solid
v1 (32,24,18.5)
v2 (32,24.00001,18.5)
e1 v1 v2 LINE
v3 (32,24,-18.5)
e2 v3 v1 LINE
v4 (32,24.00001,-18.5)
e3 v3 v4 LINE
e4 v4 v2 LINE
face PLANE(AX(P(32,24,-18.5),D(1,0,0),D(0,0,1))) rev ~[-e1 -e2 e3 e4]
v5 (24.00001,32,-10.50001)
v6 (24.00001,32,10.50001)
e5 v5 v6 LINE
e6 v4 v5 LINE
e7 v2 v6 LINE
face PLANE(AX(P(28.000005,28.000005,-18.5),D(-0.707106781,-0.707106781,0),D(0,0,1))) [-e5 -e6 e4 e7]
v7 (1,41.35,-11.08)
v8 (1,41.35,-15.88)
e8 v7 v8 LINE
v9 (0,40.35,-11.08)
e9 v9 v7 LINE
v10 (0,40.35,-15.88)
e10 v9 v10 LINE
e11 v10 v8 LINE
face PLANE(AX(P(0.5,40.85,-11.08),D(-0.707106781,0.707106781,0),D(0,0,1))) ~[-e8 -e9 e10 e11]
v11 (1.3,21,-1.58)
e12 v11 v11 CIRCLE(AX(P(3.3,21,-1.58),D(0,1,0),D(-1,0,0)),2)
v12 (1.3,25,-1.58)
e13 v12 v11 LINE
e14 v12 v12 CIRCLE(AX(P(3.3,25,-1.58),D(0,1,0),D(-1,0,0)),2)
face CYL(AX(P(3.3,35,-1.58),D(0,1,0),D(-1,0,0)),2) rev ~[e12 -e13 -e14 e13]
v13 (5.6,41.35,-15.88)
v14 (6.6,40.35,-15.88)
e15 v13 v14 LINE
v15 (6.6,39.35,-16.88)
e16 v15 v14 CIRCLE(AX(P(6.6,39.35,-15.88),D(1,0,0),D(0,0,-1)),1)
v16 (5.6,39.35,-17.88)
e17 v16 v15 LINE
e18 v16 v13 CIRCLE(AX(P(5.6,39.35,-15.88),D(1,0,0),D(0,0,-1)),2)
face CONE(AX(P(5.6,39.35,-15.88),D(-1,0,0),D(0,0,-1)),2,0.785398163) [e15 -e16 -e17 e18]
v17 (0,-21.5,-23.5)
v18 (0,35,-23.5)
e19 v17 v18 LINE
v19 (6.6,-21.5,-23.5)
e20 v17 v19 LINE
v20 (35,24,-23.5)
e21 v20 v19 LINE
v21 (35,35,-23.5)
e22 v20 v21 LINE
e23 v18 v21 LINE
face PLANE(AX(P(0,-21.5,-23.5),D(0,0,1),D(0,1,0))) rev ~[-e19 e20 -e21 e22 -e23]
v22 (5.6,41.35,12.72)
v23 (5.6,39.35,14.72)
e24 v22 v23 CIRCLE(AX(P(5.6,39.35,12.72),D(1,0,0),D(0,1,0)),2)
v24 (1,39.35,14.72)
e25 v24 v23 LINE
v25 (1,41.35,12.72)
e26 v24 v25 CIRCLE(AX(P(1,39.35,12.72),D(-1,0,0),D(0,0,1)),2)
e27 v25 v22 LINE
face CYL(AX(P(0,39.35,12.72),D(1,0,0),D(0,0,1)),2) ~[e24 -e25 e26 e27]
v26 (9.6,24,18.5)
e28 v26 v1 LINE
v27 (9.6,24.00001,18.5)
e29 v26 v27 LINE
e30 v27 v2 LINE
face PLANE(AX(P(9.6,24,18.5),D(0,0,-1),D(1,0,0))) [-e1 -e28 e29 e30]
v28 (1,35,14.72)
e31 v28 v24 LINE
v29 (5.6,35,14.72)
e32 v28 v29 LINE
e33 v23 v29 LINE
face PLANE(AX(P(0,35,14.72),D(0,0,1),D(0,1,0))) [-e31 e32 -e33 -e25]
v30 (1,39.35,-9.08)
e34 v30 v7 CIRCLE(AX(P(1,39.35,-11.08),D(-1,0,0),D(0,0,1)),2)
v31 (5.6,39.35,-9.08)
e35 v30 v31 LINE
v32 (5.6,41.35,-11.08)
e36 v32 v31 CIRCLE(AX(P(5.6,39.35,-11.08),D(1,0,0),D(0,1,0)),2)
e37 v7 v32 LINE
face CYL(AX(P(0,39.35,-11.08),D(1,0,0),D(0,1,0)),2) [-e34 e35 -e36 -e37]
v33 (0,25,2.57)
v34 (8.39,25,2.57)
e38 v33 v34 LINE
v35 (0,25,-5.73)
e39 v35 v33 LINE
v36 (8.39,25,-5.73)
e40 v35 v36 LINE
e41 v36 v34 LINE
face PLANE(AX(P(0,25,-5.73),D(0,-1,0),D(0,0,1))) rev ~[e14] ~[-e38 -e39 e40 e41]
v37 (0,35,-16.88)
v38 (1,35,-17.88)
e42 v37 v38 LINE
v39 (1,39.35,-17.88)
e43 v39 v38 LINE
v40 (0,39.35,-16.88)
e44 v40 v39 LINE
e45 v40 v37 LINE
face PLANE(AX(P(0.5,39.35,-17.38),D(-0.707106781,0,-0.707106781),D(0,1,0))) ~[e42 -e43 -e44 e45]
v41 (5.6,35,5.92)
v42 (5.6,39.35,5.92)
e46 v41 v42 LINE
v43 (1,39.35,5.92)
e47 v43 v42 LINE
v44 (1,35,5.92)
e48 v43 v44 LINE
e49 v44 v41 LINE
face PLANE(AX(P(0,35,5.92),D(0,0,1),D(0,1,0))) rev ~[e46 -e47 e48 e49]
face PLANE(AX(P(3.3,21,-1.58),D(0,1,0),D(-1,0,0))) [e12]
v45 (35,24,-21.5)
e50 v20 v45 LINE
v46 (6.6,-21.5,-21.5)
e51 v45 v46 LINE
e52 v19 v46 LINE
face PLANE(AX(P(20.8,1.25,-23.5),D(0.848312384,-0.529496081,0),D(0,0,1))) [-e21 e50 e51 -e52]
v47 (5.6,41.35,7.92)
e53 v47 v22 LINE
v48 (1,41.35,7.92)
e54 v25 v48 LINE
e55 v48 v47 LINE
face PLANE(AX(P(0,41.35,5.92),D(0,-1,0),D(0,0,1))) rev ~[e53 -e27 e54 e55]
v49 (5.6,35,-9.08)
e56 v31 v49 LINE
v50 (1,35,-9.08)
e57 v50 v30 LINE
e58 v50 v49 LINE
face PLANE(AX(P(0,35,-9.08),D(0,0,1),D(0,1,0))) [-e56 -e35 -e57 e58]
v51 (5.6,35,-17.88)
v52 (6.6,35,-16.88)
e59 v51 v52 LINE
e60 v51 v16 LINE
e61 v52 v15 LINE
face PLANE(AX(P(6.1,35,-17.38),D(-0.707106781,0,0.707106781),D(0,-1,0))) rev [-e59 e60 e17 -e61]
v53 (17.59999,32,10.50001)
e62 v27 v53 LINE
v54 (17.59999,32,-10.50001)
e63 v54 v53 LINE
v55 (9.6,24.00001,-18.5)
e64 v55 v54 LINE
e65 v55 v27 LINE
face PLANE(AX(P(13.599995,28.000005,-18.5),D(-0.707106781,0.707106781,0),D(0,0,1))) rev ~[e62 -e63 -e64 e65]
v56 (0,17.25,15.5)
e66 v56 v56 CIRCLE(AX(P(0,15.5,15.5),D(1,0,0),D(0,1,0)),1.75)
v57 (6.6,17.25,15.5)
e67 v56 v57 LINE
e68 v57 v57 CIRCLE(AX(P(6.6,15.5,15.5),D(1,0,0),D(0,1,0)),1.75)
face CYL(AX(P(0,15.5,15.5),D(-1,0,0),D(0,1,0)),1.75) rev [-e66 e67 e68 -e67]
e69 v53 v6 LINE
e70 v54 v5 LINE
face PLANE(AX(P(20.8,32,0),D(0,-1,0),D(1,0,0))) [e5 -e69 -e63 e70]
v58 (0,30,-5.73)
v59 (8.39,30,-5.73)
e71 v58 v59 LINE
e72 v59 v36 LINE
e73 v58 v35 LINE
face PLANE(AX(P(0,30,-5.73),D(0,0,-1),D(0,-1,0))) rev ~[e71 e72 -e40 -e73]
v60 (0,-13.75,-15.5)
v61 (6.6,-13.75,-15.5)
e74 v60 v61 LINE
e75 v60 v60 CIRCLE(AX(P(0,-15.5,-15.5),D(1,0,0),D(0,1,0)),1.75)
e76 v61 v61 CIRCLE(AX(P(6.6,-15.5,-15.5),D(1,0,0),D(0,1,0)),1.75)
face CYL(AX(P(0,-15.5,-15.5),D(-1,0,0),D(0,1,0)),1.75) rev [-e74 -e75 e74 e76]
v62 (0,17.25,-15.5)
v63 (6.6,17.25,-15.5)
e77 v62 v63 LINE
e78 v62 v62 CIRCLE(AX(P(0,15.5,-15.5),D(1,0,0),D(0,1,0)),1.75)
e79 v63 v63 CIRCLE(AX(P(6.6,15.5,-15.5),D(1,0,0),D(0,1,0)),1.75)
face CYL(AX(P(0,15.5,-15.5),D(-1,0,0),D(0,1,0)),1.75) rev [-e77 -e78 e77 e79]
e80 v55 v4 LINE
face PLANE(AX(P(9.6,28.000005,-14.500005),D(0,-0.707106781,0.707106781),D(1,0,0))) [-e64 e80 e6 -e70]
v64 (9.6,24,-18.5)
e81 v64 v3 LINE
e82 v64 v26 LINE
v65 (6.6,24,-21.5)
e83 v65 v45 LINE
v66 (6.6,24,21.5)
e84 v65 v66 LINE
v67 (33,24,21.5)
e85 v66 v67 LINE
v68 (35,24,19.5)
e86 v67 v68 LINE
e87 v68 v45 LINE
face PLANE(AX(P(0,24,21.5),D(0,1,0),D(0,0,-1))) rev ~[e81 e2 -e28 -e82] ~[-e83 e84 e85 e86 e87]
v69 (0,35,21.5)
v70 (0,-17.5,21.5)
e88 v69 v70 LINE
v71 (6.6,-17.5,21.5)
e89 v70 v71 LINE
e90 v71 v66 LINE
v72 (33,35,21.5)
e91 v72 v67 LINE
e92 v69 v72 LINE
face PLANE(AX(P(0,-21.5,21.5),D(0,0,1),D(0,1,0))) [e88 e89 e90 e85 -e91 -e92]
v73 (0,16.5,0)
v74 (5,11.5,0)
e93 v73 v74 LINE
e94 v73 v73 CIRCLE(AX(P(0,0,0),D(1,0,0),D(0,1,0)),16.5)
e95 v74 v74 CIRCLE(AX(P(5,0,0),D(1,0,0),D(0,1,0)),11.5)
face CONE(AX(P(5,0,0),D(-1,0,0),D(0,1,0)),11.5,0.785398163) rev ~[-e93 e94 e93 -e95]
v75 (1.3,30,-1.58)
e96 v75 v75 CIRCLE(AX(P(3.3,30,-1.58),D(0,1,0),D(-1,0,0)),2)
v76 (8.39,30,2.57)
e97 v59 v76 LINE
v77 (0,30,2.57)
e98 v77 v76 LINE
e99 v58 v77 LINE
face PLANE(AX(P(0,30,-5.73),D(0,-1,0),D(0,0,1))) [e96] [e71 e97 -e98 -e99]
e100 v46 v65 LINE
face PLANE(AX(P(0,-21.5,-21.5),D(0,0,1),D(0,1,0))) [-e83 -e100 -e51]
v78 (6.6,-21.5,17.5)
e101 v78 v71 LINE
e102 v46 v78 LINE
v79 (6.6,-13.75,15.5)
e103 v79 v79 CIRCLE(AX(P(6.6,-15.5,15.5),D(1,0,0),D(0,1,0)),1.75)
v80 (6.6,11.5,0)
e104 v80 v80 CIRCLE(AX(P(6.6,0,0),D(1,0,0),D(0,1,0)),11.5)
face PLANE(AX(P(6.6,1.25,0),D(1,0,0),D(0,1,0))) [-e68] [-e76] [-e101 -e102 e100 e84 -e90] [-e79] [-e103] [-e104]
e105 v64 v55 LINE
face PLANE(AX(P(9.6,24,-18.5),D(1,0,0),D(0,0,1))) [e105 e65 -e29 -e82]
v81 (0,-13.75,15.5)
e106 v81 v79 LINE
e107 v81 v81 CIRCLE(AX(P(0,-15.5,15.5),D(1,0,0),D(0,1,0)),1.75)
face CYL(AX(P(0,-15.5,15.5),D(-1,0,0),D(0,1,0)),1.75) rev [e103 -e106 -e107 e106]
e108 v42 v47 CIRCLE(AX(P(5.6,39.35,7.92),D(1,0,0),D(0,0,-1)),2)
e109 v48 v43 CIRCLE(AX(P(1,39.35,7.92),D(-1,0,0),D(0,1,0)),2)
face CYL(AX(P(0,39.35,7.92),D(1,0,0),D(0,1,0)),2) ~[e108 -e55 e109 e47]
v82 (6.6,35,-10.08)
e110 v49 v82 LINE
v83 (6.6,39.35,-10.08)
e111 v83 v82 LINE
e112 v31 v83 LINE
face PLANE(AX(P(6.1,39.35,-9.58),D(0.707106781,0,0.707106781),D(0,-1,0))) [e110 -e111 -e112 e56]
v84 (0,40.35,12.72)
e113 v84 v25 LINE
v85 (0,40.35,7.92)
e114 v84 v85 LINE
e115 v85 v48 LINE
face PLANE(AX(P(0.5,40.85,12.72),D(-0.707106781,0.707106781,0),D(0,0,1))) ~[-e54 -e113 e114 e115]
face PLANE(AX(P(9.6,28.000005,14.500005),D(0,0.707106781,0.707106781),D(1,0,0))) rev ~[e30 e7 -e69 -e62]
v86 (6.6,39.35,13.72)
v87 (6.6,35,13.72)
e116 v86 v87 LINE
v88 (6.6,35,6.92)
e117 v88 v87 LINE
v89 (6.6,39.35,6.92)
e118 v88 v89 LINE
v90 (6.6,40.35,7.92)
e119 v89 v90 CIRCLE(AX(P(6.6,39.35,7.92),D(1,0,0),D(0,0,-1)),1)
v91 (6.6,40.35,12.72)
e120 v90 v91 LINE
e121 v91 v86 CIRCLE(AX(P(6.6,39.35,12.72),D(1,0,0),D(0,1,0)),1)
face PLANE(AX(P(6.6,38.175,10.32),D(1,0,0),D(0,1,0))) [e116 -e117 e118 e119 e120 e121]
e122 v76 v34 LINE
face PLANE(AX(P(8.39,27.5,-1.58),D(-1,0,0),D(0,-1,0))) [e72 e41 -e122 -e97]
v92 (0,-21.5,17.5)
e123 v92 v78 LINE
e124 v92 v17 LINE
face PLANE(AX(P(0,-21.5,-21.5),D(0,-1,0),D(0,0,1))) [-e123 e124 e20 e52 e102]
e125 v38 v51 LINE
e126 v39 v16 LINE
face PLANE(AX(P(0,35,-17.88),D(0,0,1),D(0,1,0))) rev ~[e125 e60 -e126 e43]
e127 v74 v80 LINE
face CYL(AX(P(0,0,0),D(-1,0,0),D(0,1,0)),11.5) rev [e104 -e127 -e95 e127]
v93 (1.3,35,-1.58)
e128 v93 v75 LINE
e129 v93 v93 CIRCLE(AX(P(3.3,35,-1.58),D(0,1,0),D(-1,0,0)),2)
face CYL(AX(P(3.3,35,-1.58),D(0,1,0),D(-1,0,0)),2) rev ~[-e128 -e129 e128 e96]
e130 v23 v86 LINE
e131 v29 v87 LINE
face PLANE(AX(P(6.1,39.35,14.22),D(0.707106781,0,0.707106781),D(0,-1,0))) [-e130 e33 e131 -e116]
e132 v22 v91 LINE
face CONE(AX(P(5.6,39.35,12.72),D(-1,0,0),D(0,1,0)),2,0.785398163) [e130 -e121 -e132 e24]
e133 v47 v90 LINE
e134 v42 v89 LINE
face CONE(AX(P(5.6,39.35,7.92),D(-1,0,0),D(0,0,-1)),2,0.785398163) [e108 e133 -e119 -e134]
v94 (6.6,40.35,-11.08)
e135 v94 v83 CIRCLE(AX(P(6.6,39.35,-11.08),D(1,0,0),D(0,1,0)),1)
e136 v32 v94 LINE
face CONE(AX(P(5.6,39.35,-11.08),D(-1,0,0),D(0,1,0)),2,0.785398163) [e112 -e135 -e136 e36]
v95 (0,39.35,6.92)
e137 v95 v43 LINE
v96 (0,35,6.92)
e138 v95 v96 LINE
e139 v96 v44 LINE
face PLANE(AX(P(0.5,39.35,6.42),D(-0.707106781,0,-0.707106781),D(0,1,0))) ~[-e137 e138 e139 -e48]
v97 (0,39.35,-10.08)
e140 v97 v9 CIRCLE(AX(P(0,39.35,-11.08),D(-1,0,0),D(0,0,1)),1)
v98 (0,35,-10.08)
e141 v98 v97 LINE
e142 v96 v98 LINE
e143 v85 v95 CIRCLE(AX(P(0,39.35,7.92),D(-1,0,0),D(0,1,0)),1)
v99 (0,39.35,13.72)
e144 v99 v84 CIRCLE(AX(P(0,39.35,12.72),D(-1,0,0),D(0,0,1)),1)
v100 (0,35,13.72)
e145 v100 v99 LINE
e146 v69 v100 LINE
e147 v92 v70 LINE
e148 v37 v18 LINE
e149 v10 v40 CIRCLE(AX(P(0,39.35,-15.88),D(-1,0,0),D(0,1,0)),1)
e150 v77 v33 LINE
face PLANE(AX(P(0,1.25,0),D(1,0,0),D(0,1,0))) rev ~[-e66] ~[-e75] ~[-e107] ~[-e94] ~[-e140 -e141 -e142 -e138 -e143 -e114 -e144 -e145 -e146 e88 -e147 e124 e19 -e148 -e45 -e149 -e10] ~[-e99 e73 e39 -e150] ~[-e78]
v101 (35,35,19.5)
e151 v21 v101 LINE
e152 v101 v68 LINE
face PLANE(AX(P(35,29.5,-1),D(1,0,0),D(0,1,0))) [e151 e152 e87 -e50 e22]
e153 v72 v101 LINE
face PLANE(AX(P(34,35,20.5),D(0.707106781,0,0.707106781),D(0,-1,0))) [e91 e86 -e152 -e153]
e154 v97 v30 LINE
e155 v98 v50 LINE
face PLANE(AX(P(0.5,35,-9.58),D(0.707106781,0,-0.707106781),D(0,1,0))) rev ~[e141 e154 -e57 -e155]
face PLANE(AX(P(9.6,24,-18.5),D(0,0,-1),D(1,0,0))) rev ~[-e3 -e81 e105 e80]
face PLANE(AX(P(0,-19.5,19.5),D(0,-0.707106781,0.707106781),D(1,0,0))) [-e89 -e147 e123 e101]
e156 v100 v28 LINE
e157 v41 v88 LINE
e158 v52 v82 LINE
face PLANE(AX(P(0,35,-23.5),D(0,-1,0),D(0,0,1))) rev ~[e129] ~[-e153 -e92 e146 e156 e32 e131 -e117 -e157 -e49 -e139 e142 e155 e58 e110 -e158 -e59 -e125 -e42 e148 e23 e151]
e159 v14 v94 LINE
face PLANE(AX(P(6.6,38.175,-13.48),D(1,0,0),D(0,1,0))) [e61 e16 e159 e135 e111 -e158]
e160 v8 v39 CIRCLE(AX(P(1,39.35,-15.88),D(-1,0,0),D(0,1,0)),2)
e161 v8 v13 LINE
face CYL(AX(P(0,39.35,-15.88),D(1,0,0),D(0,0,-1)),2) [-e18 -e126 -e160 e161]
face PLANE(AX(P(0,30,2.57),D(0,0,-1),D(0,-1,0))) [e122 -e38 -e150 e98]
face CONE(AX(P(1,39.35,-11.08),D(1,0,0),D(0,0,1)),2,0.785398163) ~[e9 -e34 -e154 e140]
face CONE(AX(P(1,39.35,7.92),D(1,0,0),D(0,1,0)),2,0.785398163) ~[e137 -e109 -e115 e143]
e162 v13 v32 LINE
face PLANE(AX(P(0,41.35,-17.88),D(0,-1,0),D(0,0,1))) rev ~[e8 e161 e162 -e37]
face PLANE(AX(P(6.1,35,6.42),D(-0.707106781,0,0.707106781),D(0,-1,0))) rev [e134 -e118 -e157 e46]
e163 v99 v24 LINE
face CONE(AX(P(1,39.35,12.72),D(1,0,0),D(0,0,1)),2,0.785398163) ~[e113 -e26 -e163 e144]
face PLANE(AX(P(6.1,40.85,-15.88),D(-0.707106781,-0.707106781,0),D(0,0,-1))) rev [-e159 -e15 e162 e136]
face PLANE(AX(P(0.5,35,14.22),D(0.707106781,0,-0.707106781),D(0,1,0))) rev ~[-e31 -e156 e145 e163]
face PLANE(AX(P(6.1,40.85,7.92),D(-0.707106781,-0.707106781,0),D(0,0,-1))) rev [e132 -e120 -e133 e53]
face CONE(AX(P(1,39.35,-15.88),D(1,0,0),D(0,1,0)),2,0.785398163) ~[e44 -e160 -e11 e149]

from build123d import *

# Parameters (mm, degrees)
F0_W      = 45.5
F0_H      = 2
F1_DEPTH  = 35
F0_H_2    = 43
F0_R      = 1.75
F0_R_2    = 11.5
F2_DEPTH  = 6.6
F0_W_2    = 6.35
F0_H_3    = 8.8
F3_DEPTH  = 6.6
F4_R      = 2
F5_DEPTH  = 14
F6_W      = 5
F6_H      = 8.3
F7_DEPTH  = 8.39
F8_SIZE2  = 28.4
F8_SIZE   = 45.5
F9_R      = 2
F10_SIZE  = 1
F11_SIZE  = 4
F12_SIZE  = 5
F13_W     = 22.4
F13_H     = 37
F14_DEPTH = 8
F15_SIZE  = 7.99999
F16_SIZE  = 2


# Not quite as in the source:
# - a fillet or chamfer is up to 0.001 mm smaller than in the source, because OpenCascade refuses the exact size


with BuildPart() as f1:
    # F0 (on Right) → F1 (new body)
    with BuildSketch(Plane.YZ):
        Polygon((35, 21.5), (24, 21.5), (24, -21.5), (24, -23.5), (35, -23.5), (35, -17.88), (35, -9.08), (35, 5.92), (35, 14.72), align=None)
        with Locations((1.25, -22.5)):
            Rectangle(F0_W, F0_H)
    extrude(amount=F1_DEPTH)

    # F0 (on Right) → F2 (join)
    with BuildSketch(Plane.YZ):
        with Locations((1.25, 0)):
            Rectangle(F0_W, F0_H_2)
        with Locations((-15.5, -15.5)):
            Circle(F0_R, mode=Mode.SUBTRACT)
        with Locations((15.5, -15.5)):
            Circle(F0_R, mode=Mode.SUBTRACT)
        Circle(F0_R_2, mode=Mode.SUBTRACT)
        with Locations((-15.5, 15.5)):
            Circle(F0_R, mode=Mode.SUBTRACT)
        with Locations((15.5, 15.5)):
            Circle(F0_R, mode=Mode.SUBTRACT)
    extrude(amount=F2_DEPTH)

    # F0 (on Right) → F3 (join)
    with BuildSketch(Plane.YZ):
        with Locations((38.175, 10.32)):
            Rectangle(F0_W_2, F0_H_3)
        with Locations((38.175, -13.48)):
            Rectangle(F0_W_2, F0_H_3)
    extrude(amount=F3_DEPTH)

    # F4 (on face) → F5 (cut)
    with BuildSketch(Plane(origin=(0, 35, 0), x_dir=(-1, 0, 0), z_dir=(0, 1, 0))):
        with Locations((-3.3, -1.58)):
            Circle(F4_R)
    extrude(amount=-F5_DEPTH, mode=Mode.SUBTRACT)

    # F6 (on face) → F7 (cut)
    with BuildSketch(Plane(origin=(0, 0, 0), x_dir=(0, -1, 0), z_dir=(-1, 0, 0))):
        with Locations((-27.5, -1.58)):
            Rectangle(F6_W, F6_H)
    extrude(amount=-F7_DEPTH, mode=Mode.SUBTRACT)

    # F8
    f8_edges = [f1.edges().sort_by_distance(p)[0] for p in [
        (35, -21.5, -22.5),
    ]]
    f8_side = f1.faces().sort_by_distance((35, 25.113055, -4.338737))[0]
    chamfer(f8_edges, length=F8_SIZE, length2=F8_SIZE2, reference=f8_side)

    # F9
    f9_edges = [f1.edges().sort_by_distance(p)[0] for p in [
        (3.3, 41.35, 14.72),
        (3.3, 41.35, 5.92),
        (3.3, 41.35, -9.08),
        (3.3, 41.35, -17.88),
    ]]
    fillet(f9_edges, radius=F9_R)

    # F10
    f10_edges = [f1.edges().sort_by_distance(p)[0] for p in [
        (0, 37.175, -9.08),
        (0, 37.175, 14.72),
        (6.6, 37.175, -17.88),
        (6.6, 37.175, 5.92),
    ]]
    chamfer(f10_edges, length=F10_SIZE)

    # F11
    f11_edges = [f1.edges().sort_by_distance(p)[0] for p in [
        (3.3, -21.5, 21.5),
    ]]
    chamfer(f11_edges, length=F11_SIZE)

    # F12
    f12_edges = [f1.edges().sort_by_distance(p)[0] for p in [
        (0, -11.5, 0),
    ]]
    chamfer(f12_edges, length=F12_SIZE)

    # F13 (on face) → F14 (cut)
    with BuildSketch(Plane.XZ.offset(-24)):
        with Locations((20.8, 0)):
            Rectangle(F13_W, F13_H)
    extrude(amount=-F14_DEPTH, mode=Mode.SUBTRACT)

    # F15 (size 8 in the source; OpenCascade refuses exactly that, so slightly less here)
    f15_edges = [f1.edges().sort_by_distance(p)[0] for p in [
        (20.8, 32, 18.5),
        (9.6, 32, 0),
        (20.8, 32, -18.5),
        (32, 32, 0),
    ]]
    chamfer(f15_edges, length=F15_SIZE)

    # F16
    f16_edges = [f1.edges().sort_by_distance(p)[0] for p in [
        (35, 29.5, 21.5),
    ]]
    chamfer(f16_edges, length=F16_SIZE)


solid = f1.part
